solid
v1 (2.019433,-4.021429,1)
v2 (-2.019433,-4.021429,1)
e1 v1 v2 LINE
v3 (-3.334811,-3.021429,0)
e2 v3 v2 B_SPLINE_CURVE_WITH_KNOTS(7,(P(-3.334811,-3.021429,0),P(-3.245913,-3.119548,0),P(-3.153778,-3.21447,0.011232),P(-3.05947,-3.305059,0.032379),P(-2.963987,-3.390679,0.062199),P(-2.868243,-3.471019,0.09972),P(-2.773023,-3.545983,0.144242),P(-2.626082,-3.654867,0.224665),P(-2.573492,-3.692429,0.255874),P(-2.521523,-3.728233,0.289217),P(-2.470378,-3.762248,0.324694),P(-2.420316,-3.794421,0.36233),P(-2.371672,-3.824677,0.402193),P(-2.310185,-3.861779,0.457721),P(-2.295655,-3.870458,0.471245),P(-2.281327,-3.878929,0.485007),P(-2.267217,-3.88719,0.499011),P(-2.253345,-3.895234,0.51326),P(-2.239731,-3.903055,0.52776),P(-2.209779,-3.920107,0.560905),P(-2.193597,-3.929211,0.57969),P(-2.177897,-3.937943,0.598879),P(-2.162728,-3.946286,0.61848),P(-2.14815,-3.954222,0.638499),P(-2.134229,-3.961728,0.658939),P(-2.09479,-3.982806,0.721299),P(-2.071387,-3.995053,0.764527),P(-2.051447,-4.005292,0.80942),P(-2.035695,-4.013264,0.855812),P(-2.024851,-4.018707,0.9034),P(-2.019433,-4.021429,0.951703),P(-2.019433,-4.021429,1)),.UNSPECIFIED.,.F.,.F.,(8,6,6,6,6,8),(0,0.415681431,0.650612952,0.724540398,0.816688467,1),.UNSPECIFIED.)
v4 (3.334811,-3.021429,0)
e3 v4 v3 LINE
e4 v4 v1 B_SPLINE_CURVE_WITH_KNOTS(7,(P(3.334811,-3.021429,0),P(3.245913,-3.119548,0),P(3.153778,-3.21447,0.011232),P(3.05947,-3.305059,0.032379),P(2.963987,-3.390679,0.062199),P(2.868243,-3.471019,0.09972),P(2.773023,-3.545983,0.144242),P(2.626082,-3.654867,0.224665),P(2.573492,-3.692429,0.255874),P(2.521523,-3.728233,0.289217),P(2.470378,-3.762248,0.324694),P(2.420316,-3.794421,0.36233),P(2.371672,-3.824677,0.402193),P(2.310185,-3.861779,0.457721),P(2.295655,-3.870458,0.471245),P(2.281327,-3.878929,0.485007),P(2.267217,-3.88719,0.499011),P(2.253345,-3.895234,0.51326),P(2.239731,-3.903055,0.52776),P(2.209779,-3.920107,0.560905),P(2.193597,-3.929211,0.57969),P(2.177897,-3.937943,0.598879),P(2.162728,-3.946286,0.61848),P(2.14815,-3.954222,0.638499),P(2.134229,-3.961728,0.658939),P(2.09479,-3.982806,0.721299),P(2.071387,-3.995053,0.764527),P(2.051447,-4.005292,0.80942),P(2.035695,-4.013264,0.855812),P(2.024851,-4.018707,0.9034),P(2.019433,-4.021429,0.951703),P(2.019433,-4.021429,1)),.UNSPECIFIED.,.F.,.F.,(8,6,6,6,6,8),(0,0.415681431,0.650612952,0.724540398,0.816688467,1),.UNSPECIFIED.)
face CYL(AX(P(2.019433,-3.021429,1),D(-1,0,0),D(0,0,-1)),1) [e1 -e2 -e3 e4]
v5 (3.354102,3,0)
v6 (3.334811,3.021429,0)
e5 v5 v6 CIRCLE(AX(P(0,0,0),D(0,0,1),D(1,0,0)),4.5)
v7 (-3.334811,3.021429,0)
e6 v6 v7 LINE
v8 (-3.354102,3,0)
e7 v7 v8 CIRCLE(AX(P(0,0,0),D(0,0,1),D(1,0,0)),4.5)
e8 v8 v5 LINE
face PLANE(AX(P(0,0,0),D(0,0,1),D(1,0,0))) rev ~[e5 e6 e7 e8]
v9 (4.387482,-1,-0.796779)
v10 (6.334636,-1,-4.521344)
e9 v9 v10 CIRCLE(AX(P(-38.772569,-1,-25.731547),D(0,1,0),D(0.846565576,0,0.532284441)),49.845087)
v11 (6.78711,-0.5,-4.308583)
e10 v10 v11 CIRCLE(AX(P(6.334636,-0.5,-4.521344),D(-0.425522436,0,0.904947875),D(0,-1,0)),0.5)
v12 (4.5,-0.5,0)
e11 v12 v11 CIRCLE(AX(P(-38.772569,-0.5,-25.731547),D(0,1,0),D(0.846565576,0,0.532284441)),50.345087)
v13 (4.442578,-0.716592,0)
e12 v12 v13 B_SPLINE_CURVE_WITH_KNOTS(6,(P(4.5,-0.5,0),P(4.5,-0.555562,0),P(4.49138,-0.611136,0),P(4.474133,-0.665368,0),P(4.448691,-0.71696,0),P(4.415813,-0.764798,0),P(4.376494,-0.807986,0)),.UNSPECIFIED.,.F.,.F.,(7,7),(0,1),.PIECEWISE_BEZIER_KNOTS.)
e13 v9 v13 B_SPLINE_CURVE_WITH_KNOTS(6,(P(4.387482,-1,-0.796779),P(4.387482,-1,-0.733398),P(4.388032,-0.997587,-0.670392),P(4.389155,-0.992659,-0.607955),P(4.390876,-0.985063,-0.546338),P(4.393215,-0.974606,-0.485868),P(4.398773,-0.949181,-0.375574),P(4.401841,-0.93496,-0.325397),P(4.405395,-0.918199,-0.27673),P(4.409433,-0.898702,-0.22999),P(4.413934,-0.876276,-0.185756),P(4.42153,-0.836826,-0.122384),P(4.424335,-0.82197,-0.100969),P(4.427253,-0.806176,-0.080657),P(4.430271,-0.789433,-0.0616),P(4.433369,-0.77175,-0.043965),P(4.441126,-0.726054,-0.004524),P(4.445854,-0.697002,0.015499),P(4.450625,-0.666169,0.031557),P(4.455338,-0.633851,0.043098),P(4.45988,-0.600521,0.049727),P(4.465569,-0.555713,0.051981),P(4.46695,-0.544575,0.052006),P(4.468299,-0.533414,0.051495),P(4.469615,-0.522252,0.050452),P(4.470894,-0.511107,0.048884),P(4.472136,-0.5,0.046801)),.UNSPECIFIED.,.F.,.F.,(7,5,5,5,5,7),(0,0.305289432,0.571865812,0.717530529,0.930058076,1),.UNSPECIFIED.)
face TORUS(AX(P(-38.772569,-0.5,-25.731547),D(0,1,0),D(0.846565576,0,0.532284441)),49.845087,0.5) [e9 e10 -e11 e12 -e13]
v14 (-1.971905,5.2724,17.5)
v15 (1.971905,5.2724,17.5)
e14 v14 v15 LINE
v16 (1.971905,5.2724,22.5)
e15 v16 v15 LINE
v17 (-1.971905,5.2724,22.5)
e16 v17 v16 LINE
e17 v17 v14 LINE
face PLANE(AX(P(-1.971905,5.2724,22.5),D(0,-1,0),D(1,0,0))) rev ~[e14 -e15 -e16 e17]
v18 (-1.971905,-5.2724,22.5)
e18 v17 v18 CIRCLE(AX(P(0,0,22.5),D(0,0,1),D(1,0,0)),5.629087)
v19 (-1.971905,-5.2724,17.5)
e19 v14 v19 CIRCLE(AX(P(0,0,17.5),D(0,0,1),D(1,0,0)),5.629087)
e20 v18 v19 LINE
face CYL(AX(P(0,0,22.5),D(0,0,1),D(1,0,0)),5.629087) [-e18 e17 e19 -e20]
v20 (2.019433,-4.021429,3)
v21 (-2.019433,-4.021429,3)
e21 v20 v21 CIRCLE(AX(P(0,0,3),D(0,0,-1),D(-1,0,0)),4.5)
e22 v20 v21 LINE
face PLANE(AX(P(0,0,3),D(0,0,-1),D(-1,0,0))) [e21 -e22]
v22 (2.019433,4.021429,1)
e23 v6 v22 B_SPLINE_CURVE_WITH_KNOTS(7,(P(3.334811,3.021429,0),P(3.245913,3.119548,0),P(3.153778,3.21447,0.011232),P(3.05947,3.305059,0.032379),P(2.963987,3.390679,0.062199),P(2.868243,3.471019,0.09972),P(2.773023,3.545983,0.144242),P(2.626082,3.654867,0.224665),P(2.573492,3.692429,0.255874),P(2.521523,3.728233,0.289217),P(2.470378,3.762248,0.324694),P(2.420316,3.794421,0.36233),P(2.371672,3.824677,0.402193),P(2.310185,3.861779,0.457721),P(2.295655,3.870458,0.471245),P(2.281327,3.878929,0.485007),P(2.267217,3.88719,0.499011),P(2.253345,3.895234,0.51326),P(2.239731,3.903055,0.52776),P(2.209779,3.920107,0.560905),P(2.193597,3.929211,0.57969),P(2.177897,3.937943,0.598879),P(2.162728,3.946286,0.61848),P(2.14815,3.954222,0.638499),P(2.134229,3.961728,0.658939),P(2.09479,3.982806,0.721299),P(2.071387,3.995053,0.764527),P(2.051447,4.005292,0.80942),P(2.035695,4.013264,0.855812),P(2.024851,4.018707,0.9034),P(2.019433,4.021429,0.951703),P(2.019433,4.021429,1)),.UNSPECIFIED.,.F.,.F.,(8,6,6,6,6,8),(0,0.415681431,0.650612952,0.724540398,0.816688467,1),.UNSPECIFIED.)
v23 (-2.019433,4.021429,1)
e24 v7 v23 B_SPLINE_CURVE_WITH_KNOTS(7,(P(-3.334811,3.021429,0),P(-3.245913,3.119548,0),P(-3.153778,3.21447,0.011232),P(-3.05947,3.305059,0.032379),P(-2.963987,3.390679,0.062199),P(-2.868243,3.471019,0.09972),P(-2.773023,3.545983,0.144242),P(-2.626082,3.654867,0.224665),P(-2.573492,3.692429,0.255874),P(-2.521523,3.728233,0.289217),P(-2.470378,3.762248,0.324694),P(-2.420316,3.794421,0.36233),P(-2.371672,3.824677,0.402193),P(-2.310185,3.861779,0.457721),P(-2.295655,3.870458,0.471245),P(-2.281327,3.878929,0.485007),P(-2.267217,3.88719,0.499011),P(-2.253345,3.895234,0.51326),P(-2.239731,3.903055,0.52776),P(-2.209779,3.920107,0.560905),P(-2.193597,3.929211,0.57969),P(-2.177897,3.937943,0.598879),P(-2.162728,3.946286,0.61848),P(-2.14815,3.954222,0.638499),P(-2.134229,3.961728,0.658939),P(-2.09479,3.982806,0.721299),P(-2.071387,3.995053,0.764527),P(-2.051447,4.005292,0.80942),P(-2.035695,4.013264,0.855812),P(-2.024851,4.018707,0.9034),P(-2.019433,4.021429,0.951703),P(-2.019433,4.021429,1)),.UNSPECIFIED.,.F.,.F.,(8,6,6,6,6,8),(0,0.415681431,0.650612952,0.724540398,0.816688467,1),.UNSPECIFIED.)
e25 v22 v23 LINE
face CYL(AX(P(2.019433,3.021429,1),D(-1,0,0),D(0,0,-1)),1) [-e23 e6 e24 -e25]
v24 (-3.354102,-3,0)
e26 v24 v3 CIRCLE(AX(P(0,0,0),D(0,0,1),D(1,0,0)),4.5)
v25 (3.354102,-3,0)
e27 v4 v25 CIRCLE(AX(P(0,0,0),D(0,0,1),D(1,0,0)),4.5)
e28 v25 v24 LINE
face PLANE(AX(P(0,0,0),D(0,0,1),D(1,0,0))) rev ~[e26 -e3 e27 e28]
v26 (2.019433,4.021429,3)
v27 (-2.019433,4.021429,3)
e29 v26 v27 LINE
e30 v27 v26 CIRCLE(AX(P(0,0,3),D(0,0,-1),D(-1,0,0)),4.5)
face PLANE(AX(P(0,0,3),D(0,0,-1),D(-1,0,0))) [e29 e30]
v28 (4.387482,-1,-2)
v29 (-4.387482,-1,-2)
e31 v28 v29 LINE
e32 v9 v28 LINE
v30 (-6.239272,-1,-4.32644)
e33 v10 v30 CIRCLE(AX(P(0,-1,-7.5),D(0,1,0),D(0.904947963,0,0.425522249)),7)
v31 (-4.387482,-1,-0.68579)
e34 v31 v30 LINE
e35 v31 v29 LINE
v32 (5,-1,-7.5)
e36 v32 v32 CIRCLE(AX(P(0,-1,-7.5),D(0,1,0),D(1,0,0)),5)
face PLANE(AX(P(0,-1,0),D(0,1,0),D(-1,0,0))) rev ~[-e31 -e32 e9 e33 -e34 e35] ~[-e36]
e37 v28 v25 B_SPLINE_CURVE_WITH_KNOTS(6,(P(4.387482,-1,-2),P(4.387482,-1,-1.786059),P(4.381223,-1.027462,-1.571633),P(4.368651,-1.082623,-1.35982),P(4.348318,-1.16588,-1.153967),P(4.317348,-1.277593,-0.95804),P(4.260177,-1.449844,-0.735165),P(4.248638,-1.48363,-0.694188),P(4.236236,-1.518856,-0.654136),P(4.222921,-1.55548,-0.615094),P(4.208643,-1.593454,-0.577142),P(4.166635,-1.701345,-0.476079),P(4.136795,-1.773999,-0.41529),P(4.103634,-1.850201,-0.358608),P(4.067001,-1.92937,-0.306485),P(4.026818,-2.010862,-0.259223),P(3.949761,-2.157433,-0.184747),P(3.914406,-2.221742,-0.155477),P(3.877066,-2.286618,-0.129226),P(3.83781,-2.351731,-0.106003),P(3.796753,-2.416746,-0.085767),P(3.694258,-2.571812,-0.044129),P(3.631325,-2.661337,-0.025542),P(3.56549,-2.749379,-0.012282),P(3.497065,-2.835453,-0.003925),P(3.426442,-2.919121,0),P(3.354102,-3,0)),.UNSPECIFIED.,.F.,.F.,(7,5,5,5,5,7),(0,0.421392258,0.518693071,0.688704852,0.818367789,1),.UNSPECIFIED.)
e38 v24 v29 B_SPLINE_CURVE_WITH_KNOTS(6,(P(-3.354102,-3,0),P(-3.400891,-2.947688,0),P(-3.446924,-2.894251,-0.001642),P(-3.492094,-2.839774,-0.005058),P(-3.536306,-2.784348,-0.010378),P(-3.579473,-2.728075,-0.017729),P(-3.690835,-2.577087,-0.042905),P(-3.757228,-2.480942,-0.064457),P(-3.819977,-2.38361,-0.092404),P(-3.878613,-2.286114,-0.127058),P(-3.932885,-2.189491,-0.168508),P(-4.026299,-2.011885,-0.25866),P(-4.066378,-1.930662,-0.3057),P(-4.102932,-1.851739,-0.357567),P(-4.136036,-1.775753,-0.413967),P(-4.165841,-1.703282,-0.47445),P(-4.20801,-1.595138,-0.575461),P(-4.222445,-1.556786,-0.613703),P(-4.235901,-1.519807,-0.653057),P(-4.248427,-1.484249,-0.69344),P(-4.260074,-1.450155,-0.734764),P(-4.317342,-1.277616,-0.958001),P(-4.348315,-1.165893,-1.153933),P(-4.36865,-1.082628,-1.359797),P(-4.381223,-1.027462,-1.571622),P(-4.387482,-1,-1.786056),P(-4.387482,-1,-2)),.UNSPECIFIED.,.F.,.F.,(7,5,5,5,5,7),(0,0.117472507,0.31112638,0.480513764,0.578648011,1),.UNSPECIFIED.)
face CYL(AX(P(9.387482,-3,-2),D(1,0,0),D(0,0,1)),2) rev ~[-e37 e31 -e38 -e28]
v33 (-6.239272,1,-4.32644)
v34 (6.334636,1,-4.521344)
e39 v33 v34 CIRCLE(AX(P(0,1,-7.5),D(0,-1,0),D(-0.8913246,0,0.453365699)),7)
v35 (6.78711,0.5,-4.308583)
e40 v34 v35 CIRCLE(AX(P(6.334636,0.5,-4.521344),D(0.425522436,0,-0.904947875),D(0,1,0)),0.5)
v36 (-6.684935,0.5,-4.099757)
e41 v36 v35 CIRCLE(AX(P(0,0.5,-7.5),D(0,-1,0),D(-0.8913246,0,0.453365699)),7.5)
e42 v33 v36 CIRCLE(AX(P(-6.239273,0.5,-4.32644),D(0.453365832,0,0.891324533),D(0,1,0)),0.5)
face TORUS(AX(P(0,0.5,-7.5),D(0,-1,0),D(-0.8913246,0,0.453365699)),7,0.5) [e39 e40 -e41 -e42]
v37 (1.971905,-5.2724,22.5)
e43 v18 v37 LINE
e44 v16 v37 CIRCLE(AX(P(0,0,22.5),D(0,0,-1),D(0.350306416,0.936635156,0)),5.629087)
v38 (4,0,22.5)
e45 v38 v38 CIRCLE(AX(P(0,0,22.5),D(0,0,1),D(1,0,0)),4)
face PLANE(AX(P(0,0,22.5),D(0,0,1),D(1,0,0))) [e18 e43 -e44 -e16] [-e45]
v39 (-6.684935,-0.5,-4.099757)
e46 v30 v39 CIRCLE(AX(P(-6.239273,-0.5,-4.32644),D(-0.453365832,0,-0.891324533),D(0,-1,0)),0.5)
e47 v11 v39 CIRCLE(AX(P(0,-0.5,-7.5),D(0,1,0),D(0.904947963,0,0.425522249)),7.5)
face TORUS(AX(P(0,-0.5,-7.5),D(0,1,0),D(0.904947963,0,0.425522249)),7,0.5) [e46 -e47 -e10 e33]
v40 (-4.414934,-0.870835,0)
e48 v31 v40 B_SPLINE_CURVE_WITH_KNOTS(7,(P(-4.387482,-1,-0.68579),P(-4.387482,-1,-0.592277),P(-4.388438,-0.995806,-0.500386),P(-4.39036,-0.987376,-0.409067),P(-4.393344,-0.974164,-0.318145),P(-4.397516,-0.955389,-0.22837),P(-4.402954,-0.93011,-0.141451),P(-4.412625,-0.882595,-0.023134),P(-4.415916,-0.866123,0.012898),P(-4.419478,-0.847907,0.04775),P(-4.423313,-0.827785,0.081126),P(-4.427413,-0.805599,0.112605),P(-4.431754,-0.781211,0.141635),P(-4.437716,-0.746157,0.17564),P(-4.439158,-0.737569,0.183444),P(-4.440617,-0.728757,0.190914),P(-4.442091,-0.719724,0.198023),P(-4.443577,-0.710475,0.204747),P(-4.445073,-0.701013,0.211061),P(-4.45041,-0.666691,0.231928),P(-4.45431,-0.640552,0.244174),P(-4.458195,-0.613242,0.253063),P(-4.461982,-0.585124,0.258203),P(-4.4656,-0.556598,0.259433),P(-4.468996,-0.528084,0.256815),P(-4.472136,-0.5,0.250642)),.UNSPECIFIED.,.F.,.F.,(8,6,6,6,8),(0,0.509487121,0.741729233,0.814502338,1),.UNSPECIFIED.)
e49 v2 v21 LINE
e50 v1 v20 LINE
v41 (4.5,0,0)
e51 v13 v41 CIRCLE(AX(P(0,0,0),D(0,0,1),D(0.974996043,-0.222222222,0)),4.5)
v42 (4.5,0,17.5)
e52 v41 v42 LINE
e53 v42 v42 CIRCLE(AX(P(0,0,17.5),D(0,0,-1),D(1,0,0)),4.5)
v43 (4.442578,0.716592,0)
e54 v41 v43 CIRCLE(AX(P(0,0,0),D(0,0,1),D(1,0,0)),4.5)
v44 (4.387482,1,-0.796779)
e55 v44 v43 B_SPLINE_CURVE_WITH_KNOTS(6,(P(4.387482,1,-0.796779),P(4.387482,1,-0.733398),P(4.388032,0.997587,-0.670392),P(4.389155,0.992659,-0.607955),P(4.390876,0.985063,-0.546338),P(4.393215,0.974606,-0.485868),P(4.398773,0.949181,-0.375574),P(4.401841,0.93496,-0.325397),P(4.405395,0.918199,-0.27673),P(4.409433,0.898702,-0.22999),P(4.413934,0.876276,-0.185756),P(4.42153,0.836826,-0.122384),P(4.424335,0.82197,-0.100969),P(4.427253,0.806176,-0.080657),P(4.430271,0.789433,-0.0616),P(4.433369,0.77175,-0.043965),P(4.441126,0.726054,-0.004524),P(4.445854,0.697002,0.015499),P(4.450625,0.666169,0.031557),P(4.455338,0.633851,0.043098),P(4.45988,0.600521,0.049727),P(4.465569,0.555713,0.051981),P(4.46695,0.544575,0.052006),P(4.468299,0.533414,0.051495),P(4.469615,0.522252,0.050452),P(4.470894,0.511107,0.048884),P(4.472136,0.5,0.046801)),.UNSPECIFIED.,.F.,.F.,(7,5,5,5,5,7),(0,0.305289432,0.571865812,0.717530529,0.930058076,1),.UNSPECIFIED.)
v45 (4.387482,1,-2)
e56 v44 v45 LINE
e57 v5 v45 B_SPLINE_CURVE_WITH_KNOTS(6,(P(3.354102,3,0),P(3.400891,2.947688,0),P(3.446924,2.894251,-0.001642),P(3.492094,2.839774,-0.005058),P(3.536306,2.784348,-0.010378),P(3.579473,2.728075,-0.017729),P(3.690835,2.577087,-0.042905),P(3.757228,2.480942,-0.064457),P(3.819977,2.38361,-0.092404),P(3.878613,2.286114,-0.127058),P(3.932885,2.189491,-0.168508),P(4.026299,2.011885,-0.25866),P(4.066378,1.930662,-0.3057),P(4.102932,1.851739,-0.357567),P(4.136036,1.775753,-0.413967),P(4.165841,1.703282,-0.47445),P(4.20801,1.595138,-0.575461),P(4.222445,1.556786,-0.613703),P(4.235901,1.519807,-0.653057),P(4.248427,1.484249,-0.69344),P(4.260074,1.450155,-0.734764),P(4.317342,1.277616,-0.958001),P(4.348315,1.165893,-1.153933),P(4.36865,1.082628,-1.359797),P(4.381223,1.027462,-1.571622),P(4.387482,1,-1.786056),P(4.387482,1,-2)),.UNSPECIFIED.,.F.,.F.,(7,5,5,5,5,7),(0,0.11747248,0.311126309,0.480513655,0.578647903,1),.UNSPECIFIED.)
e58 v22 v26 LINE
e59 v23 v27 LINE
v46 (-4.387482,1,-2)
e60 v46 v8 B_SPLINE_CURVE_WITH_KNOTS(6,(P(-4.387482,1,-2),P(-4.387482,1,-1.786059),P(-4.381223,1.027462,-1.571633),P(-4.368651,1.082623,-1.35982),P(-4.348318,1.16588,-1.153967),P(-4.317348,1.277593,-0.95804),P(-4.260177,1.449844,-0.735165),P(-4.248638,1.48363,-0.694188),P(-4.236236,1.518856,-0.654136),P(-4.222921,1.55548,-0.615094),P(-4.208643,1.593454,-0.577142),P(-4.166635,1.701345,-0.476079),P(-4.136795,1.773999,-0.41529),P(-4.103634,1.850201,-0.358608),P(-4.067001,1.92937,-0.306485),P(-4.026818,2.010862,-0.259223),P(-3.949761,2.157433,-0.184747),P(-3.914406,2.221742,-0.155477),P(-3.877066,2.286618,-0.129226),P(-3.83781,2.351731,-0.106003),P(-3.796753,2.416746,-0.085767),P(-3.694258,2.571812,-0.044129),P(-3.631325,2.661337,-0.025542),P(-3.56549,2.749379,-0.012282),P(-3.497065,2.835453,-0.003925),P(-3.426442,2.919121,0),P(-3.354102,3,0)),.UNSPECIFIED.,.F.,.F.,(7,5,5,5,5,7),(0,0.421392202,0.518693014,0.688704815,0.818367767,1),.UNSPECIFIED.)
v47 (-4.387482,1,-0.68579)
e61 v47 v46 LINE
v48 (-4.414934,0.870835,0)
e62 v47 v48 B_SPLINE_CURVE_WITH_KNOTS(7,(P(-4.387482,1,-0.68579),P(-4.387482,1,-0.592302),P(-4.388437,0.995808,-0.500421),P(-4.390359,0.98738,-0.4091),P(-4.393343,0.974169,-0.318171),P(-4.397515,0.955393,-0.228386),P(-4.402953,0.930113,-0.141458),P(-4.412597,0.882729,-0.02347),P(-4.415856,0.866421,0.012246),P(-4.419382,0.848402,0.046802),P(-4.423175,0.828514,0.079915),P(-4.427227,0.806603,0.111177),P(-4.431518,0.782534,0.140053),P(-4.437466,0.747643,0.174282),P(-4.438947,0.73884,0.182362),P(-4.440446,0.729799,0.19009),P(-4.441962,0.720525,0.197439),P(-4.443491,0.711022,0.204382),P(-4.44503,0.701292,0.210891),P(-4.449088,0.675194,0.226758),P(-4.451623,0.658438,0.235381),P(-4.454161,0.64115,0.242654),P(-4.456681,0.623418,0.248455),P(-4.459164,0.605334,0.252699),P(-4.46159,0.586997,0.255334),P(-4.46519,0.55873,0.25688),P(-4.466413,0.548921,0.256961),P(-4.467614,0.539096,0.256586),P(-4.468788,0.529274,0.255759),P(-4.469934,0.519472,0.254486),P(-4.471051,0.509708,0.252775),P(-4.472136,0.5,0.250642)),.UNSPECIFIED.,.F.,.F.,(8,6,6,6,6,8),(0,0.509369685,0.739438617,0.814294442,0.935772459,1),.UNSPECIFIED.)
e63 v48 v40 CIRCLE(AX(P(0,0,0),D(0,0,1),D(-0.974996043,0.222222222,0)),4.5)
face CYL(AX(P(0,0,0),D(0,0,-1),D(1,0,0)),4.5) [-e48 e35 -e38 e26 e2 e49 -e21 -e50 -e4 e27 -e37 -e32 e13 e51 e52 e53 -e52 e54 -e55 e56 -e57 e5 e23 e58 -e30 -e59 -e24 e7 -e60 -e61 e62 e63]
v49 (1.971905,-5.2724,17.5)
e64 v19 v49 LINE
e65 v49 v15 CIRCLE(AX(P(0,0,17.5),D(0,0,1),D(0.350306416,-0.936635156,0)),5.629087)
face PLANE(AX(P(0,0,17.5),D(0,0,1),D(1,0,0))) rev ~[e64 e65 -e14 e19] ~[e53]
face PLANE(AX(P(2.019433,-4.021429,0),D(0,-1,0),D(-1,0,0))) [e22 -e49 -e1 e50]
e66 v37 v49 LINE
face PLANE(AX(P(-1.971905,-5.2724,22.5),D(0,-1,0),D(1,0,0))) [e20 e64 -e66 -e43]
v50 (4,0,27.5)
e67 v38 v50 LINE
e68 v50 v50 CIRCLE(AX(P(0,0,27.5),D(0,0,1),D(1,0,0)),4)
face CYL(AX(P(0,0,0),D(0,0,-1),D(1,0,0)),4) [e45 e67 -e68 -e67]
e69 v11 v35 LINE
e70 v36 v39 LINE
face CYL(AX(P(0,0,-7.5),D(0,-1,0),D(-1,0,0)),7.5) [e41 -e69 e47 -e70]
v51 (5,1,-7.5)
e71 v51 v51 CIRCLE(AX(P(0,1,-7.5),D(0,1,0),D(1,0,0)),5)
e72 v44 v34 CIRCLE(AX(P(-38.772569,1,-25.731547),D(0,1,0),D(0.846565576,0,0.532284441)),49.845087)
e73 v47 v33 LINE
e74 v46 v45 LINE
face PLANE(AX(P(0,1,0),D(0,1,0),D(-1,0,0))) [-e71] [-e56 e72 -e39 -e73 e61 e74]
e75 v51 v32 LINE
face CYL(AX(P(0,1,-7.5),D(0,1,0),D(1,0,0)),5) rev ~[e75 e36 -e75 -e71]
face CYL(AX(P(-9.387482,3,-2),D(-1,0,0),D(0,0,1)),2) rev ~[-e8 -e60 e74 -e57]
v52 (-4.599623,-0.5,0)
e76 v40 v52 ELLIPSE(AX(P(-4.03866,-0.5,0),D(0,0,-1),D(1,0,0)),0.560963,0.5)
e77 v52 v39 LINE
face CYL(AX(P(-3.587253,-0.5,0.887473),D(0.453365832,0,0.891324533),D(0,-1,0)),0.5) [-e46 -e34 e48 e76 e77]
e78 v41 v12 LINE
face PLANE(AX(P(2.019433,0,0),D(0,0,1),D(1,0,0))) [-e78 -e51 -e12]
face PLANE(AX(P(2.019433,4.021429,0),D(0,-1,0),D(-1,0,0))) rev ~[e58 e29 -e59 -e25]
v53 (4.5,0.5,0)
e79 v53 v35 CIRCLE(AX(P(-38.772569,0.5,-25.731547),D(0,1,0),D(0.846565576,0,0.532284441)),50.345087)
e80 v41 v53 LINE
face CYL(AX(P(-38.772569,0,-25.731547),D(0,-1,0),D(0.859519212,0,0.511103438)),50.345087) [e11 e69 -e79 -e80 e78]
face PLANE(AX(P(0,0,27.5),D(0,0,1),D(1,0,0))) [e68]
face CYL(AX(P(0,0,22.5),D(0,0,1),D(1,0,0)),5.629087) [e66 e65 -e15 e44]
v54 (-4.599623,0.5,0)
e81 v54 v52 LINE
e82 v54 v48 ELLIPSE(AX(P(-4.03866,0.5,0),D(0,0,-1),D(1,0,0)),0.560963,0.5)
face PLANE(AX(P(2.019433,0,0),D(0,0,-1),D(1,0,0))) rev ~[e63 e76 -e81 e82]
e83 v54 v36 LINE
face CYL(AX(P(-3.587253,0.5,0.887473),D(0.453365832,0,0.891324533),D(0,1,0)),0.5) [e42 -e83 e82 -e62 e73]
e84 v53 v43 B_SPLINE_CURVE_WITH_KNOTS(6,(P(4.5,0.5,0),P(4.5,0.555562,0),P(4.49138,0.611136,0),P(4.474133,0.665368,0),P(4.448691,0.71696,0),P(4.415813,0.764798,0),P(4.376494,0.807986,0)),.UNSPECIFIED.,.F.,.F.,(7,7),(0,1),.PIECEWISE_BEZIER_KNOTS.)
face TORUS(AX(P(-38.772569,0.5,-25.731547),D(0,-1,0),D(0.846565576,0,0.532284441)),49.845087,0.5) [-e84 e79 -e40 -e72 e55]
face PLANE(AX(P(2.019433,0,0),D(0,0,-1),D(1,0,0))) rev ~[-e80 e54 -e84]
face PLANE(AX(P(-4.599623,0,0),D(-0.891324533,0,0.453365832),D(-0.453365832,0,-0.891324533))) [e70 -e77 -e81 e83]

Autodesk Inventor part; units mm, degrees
ref_plane "YZ Plane" through (0, 0, 0) normal (1, 0, 0) x (0, 1, 0)
ref_plane "XZ Plane" through (0, 0, 0) normal (0, 1, 0) x (-1, 0, 0)
ref_plane "XY Plane" through (0, 0, 0) normal (0, 0, 1) x (1, 0, 0)
sketch "Sketch1" plane through (0, 0, 0) normal (0, 0, 1) x (1, 0, 0)
  circle A0 centre (0, 0) radius 4
  line L0 (-1.555751, 4.751804) -> (1.555751, 4.751804)
  line L1 (0, 0) -> (1.555751, 0)
  line L2 (-1.555751, -4.751804) -> (1.555751, -4.751804)
  arc A1 (-1.555751, 4.751804) -> (-1.555751, -4.751804) centre (0, 0) ccw
  arc A2 (1.555751, -4.751804) -> (1.555751, 4.751804) centre (0, 0) ccw
  circle A3 centre (0, 0) radius 4.5
  dimension "d0" = 8
  dimension "d2" = 9
extrude "Extrusion1" add sketch "Sketch1" along normal blind 27.5 contours A0
extrude "Extrusion2" add sketch "Sketch1" along normal blind 22.5 contours A3
sketch "Sketch2" plane through (0, 0, 22.5) normal (0, 0, 1) x (1, 0, 0)
  circle A0 centre (0, 0) radius 5.629087
  line L0 (0, 0) -> (1.158118, 0)
  line L1 (-1.971905, 5.2724) -> (1.971905, 5.2724)
  line L2 (-1.971905, -5.2724) -> (1.971905, -5.2724)
extrude "Extrusion3" add sketch "Sketch2" against normal blind 5 contours A0 L2 L1
sketch "Sketch3" plane through (0, 0, 0) normal (0, 0, -1) x (-1, 0, 0)
  circle A0 centre (0, 0) radius 4.5
  line L0 (-2.019433, 4.021429) -> (2.019433, 4.021429)
  line L1 (0, 0) -> (1.467716, 0)
  line L2 (-2.019433, -4.021429) -> (2.019433, -4.021429)
  arc A1 (2.019433, 4.021429) -> (-2.019433, 4.021429) centre (0, 0) ccw
  arc A2 (-2.019433, -4.021429) -> (2.019433, -4.021429) centre (0, 0) ccw
extrude "Extrusion4" cut sketch "Sketch3" against normal blind 3 contours L0 A0 | A0 L2
sketch "Sketch4" plane through (0, 0, 0) normal (0, 1, 0) x (-1, 0, 0)
  circle A0 centre (0, -7.5) radius 7.5
  line L0 (2.019433, 0) -> (-2.019433, 0)
  line L1 (-2.019433, 0) -> (-4.5, 0)
  line L2 (-4.5, 0) -> (4.599623, 0)
  arc A1 (-4.5, 0) -> (-6.78711, -4.308583) centre (38.772452, -25.731481) ccw
  line L3 (4.599623, 0) -> (6.684935, -4.099757)
  line L4 (-4.5, 0) -> (4.599623, 0)
  point P0 (0, 0)
  point P1 (0, 0)
  dimension "d11" = 15
  dimension "d12" = 7.5
extrude "Extrusion5" add sketch "Sketch4" against normal blind 1
extrude "Extrusion6" add sketch "Sketch4" along normal blind 1
sketch "Sketch6" plane through (0, 1, 0) normal (0, 1, 0) x (1, 0, 0)
  arc A0 (6.78711, 4.308583) -> (-6.684935, 4.099757) centre (0, 7.5) ccw
  circle A1 centre (0, 7.5) radius 5
  point P0 (0, 0)
  dimension "d17" = 10
extrude "Extrusion7" cut sketch "Sketch6" against normal blind 2
fillet "Fillet1" radius 2 2 edges at (0, 1, 0) (0, -1, 0)
fillet "Fillet2" radius 1 2 edges at (0, -4.0214, 0) (0, 4.0214, 0)
fillet "Fillet3" radius 0.5 6 edges at (-5.6423, 1, -2.0499) (5.6958, 1, -2.1266) (-0.1162, 1, -14.9991) (5.6958, -1, -2.1266) (-5.6423, -1, -2.0499) (-0.1162, -1, -14.9991)
equation "\"BendRadius\" = Thickness"
equation "\"BendReliefWidth\" = Thickness"
equation "\"BendReliefDepth\" = 0.5 * Thickness"
equation "\"CornerReliefSize\" = 4 * Thickness"
equation "\"MinimumRemnant\" = 2 * Thickness"
equation "\"TransitionRadius\" = BendRadius"
equation "\"JacobiRadiusSize\" = BendRadius"
equation "\"GapSize\" = Thickness"
equation "\"Thickness\" = 0.5"
properties part number "vòng bi_dài 35mm"
